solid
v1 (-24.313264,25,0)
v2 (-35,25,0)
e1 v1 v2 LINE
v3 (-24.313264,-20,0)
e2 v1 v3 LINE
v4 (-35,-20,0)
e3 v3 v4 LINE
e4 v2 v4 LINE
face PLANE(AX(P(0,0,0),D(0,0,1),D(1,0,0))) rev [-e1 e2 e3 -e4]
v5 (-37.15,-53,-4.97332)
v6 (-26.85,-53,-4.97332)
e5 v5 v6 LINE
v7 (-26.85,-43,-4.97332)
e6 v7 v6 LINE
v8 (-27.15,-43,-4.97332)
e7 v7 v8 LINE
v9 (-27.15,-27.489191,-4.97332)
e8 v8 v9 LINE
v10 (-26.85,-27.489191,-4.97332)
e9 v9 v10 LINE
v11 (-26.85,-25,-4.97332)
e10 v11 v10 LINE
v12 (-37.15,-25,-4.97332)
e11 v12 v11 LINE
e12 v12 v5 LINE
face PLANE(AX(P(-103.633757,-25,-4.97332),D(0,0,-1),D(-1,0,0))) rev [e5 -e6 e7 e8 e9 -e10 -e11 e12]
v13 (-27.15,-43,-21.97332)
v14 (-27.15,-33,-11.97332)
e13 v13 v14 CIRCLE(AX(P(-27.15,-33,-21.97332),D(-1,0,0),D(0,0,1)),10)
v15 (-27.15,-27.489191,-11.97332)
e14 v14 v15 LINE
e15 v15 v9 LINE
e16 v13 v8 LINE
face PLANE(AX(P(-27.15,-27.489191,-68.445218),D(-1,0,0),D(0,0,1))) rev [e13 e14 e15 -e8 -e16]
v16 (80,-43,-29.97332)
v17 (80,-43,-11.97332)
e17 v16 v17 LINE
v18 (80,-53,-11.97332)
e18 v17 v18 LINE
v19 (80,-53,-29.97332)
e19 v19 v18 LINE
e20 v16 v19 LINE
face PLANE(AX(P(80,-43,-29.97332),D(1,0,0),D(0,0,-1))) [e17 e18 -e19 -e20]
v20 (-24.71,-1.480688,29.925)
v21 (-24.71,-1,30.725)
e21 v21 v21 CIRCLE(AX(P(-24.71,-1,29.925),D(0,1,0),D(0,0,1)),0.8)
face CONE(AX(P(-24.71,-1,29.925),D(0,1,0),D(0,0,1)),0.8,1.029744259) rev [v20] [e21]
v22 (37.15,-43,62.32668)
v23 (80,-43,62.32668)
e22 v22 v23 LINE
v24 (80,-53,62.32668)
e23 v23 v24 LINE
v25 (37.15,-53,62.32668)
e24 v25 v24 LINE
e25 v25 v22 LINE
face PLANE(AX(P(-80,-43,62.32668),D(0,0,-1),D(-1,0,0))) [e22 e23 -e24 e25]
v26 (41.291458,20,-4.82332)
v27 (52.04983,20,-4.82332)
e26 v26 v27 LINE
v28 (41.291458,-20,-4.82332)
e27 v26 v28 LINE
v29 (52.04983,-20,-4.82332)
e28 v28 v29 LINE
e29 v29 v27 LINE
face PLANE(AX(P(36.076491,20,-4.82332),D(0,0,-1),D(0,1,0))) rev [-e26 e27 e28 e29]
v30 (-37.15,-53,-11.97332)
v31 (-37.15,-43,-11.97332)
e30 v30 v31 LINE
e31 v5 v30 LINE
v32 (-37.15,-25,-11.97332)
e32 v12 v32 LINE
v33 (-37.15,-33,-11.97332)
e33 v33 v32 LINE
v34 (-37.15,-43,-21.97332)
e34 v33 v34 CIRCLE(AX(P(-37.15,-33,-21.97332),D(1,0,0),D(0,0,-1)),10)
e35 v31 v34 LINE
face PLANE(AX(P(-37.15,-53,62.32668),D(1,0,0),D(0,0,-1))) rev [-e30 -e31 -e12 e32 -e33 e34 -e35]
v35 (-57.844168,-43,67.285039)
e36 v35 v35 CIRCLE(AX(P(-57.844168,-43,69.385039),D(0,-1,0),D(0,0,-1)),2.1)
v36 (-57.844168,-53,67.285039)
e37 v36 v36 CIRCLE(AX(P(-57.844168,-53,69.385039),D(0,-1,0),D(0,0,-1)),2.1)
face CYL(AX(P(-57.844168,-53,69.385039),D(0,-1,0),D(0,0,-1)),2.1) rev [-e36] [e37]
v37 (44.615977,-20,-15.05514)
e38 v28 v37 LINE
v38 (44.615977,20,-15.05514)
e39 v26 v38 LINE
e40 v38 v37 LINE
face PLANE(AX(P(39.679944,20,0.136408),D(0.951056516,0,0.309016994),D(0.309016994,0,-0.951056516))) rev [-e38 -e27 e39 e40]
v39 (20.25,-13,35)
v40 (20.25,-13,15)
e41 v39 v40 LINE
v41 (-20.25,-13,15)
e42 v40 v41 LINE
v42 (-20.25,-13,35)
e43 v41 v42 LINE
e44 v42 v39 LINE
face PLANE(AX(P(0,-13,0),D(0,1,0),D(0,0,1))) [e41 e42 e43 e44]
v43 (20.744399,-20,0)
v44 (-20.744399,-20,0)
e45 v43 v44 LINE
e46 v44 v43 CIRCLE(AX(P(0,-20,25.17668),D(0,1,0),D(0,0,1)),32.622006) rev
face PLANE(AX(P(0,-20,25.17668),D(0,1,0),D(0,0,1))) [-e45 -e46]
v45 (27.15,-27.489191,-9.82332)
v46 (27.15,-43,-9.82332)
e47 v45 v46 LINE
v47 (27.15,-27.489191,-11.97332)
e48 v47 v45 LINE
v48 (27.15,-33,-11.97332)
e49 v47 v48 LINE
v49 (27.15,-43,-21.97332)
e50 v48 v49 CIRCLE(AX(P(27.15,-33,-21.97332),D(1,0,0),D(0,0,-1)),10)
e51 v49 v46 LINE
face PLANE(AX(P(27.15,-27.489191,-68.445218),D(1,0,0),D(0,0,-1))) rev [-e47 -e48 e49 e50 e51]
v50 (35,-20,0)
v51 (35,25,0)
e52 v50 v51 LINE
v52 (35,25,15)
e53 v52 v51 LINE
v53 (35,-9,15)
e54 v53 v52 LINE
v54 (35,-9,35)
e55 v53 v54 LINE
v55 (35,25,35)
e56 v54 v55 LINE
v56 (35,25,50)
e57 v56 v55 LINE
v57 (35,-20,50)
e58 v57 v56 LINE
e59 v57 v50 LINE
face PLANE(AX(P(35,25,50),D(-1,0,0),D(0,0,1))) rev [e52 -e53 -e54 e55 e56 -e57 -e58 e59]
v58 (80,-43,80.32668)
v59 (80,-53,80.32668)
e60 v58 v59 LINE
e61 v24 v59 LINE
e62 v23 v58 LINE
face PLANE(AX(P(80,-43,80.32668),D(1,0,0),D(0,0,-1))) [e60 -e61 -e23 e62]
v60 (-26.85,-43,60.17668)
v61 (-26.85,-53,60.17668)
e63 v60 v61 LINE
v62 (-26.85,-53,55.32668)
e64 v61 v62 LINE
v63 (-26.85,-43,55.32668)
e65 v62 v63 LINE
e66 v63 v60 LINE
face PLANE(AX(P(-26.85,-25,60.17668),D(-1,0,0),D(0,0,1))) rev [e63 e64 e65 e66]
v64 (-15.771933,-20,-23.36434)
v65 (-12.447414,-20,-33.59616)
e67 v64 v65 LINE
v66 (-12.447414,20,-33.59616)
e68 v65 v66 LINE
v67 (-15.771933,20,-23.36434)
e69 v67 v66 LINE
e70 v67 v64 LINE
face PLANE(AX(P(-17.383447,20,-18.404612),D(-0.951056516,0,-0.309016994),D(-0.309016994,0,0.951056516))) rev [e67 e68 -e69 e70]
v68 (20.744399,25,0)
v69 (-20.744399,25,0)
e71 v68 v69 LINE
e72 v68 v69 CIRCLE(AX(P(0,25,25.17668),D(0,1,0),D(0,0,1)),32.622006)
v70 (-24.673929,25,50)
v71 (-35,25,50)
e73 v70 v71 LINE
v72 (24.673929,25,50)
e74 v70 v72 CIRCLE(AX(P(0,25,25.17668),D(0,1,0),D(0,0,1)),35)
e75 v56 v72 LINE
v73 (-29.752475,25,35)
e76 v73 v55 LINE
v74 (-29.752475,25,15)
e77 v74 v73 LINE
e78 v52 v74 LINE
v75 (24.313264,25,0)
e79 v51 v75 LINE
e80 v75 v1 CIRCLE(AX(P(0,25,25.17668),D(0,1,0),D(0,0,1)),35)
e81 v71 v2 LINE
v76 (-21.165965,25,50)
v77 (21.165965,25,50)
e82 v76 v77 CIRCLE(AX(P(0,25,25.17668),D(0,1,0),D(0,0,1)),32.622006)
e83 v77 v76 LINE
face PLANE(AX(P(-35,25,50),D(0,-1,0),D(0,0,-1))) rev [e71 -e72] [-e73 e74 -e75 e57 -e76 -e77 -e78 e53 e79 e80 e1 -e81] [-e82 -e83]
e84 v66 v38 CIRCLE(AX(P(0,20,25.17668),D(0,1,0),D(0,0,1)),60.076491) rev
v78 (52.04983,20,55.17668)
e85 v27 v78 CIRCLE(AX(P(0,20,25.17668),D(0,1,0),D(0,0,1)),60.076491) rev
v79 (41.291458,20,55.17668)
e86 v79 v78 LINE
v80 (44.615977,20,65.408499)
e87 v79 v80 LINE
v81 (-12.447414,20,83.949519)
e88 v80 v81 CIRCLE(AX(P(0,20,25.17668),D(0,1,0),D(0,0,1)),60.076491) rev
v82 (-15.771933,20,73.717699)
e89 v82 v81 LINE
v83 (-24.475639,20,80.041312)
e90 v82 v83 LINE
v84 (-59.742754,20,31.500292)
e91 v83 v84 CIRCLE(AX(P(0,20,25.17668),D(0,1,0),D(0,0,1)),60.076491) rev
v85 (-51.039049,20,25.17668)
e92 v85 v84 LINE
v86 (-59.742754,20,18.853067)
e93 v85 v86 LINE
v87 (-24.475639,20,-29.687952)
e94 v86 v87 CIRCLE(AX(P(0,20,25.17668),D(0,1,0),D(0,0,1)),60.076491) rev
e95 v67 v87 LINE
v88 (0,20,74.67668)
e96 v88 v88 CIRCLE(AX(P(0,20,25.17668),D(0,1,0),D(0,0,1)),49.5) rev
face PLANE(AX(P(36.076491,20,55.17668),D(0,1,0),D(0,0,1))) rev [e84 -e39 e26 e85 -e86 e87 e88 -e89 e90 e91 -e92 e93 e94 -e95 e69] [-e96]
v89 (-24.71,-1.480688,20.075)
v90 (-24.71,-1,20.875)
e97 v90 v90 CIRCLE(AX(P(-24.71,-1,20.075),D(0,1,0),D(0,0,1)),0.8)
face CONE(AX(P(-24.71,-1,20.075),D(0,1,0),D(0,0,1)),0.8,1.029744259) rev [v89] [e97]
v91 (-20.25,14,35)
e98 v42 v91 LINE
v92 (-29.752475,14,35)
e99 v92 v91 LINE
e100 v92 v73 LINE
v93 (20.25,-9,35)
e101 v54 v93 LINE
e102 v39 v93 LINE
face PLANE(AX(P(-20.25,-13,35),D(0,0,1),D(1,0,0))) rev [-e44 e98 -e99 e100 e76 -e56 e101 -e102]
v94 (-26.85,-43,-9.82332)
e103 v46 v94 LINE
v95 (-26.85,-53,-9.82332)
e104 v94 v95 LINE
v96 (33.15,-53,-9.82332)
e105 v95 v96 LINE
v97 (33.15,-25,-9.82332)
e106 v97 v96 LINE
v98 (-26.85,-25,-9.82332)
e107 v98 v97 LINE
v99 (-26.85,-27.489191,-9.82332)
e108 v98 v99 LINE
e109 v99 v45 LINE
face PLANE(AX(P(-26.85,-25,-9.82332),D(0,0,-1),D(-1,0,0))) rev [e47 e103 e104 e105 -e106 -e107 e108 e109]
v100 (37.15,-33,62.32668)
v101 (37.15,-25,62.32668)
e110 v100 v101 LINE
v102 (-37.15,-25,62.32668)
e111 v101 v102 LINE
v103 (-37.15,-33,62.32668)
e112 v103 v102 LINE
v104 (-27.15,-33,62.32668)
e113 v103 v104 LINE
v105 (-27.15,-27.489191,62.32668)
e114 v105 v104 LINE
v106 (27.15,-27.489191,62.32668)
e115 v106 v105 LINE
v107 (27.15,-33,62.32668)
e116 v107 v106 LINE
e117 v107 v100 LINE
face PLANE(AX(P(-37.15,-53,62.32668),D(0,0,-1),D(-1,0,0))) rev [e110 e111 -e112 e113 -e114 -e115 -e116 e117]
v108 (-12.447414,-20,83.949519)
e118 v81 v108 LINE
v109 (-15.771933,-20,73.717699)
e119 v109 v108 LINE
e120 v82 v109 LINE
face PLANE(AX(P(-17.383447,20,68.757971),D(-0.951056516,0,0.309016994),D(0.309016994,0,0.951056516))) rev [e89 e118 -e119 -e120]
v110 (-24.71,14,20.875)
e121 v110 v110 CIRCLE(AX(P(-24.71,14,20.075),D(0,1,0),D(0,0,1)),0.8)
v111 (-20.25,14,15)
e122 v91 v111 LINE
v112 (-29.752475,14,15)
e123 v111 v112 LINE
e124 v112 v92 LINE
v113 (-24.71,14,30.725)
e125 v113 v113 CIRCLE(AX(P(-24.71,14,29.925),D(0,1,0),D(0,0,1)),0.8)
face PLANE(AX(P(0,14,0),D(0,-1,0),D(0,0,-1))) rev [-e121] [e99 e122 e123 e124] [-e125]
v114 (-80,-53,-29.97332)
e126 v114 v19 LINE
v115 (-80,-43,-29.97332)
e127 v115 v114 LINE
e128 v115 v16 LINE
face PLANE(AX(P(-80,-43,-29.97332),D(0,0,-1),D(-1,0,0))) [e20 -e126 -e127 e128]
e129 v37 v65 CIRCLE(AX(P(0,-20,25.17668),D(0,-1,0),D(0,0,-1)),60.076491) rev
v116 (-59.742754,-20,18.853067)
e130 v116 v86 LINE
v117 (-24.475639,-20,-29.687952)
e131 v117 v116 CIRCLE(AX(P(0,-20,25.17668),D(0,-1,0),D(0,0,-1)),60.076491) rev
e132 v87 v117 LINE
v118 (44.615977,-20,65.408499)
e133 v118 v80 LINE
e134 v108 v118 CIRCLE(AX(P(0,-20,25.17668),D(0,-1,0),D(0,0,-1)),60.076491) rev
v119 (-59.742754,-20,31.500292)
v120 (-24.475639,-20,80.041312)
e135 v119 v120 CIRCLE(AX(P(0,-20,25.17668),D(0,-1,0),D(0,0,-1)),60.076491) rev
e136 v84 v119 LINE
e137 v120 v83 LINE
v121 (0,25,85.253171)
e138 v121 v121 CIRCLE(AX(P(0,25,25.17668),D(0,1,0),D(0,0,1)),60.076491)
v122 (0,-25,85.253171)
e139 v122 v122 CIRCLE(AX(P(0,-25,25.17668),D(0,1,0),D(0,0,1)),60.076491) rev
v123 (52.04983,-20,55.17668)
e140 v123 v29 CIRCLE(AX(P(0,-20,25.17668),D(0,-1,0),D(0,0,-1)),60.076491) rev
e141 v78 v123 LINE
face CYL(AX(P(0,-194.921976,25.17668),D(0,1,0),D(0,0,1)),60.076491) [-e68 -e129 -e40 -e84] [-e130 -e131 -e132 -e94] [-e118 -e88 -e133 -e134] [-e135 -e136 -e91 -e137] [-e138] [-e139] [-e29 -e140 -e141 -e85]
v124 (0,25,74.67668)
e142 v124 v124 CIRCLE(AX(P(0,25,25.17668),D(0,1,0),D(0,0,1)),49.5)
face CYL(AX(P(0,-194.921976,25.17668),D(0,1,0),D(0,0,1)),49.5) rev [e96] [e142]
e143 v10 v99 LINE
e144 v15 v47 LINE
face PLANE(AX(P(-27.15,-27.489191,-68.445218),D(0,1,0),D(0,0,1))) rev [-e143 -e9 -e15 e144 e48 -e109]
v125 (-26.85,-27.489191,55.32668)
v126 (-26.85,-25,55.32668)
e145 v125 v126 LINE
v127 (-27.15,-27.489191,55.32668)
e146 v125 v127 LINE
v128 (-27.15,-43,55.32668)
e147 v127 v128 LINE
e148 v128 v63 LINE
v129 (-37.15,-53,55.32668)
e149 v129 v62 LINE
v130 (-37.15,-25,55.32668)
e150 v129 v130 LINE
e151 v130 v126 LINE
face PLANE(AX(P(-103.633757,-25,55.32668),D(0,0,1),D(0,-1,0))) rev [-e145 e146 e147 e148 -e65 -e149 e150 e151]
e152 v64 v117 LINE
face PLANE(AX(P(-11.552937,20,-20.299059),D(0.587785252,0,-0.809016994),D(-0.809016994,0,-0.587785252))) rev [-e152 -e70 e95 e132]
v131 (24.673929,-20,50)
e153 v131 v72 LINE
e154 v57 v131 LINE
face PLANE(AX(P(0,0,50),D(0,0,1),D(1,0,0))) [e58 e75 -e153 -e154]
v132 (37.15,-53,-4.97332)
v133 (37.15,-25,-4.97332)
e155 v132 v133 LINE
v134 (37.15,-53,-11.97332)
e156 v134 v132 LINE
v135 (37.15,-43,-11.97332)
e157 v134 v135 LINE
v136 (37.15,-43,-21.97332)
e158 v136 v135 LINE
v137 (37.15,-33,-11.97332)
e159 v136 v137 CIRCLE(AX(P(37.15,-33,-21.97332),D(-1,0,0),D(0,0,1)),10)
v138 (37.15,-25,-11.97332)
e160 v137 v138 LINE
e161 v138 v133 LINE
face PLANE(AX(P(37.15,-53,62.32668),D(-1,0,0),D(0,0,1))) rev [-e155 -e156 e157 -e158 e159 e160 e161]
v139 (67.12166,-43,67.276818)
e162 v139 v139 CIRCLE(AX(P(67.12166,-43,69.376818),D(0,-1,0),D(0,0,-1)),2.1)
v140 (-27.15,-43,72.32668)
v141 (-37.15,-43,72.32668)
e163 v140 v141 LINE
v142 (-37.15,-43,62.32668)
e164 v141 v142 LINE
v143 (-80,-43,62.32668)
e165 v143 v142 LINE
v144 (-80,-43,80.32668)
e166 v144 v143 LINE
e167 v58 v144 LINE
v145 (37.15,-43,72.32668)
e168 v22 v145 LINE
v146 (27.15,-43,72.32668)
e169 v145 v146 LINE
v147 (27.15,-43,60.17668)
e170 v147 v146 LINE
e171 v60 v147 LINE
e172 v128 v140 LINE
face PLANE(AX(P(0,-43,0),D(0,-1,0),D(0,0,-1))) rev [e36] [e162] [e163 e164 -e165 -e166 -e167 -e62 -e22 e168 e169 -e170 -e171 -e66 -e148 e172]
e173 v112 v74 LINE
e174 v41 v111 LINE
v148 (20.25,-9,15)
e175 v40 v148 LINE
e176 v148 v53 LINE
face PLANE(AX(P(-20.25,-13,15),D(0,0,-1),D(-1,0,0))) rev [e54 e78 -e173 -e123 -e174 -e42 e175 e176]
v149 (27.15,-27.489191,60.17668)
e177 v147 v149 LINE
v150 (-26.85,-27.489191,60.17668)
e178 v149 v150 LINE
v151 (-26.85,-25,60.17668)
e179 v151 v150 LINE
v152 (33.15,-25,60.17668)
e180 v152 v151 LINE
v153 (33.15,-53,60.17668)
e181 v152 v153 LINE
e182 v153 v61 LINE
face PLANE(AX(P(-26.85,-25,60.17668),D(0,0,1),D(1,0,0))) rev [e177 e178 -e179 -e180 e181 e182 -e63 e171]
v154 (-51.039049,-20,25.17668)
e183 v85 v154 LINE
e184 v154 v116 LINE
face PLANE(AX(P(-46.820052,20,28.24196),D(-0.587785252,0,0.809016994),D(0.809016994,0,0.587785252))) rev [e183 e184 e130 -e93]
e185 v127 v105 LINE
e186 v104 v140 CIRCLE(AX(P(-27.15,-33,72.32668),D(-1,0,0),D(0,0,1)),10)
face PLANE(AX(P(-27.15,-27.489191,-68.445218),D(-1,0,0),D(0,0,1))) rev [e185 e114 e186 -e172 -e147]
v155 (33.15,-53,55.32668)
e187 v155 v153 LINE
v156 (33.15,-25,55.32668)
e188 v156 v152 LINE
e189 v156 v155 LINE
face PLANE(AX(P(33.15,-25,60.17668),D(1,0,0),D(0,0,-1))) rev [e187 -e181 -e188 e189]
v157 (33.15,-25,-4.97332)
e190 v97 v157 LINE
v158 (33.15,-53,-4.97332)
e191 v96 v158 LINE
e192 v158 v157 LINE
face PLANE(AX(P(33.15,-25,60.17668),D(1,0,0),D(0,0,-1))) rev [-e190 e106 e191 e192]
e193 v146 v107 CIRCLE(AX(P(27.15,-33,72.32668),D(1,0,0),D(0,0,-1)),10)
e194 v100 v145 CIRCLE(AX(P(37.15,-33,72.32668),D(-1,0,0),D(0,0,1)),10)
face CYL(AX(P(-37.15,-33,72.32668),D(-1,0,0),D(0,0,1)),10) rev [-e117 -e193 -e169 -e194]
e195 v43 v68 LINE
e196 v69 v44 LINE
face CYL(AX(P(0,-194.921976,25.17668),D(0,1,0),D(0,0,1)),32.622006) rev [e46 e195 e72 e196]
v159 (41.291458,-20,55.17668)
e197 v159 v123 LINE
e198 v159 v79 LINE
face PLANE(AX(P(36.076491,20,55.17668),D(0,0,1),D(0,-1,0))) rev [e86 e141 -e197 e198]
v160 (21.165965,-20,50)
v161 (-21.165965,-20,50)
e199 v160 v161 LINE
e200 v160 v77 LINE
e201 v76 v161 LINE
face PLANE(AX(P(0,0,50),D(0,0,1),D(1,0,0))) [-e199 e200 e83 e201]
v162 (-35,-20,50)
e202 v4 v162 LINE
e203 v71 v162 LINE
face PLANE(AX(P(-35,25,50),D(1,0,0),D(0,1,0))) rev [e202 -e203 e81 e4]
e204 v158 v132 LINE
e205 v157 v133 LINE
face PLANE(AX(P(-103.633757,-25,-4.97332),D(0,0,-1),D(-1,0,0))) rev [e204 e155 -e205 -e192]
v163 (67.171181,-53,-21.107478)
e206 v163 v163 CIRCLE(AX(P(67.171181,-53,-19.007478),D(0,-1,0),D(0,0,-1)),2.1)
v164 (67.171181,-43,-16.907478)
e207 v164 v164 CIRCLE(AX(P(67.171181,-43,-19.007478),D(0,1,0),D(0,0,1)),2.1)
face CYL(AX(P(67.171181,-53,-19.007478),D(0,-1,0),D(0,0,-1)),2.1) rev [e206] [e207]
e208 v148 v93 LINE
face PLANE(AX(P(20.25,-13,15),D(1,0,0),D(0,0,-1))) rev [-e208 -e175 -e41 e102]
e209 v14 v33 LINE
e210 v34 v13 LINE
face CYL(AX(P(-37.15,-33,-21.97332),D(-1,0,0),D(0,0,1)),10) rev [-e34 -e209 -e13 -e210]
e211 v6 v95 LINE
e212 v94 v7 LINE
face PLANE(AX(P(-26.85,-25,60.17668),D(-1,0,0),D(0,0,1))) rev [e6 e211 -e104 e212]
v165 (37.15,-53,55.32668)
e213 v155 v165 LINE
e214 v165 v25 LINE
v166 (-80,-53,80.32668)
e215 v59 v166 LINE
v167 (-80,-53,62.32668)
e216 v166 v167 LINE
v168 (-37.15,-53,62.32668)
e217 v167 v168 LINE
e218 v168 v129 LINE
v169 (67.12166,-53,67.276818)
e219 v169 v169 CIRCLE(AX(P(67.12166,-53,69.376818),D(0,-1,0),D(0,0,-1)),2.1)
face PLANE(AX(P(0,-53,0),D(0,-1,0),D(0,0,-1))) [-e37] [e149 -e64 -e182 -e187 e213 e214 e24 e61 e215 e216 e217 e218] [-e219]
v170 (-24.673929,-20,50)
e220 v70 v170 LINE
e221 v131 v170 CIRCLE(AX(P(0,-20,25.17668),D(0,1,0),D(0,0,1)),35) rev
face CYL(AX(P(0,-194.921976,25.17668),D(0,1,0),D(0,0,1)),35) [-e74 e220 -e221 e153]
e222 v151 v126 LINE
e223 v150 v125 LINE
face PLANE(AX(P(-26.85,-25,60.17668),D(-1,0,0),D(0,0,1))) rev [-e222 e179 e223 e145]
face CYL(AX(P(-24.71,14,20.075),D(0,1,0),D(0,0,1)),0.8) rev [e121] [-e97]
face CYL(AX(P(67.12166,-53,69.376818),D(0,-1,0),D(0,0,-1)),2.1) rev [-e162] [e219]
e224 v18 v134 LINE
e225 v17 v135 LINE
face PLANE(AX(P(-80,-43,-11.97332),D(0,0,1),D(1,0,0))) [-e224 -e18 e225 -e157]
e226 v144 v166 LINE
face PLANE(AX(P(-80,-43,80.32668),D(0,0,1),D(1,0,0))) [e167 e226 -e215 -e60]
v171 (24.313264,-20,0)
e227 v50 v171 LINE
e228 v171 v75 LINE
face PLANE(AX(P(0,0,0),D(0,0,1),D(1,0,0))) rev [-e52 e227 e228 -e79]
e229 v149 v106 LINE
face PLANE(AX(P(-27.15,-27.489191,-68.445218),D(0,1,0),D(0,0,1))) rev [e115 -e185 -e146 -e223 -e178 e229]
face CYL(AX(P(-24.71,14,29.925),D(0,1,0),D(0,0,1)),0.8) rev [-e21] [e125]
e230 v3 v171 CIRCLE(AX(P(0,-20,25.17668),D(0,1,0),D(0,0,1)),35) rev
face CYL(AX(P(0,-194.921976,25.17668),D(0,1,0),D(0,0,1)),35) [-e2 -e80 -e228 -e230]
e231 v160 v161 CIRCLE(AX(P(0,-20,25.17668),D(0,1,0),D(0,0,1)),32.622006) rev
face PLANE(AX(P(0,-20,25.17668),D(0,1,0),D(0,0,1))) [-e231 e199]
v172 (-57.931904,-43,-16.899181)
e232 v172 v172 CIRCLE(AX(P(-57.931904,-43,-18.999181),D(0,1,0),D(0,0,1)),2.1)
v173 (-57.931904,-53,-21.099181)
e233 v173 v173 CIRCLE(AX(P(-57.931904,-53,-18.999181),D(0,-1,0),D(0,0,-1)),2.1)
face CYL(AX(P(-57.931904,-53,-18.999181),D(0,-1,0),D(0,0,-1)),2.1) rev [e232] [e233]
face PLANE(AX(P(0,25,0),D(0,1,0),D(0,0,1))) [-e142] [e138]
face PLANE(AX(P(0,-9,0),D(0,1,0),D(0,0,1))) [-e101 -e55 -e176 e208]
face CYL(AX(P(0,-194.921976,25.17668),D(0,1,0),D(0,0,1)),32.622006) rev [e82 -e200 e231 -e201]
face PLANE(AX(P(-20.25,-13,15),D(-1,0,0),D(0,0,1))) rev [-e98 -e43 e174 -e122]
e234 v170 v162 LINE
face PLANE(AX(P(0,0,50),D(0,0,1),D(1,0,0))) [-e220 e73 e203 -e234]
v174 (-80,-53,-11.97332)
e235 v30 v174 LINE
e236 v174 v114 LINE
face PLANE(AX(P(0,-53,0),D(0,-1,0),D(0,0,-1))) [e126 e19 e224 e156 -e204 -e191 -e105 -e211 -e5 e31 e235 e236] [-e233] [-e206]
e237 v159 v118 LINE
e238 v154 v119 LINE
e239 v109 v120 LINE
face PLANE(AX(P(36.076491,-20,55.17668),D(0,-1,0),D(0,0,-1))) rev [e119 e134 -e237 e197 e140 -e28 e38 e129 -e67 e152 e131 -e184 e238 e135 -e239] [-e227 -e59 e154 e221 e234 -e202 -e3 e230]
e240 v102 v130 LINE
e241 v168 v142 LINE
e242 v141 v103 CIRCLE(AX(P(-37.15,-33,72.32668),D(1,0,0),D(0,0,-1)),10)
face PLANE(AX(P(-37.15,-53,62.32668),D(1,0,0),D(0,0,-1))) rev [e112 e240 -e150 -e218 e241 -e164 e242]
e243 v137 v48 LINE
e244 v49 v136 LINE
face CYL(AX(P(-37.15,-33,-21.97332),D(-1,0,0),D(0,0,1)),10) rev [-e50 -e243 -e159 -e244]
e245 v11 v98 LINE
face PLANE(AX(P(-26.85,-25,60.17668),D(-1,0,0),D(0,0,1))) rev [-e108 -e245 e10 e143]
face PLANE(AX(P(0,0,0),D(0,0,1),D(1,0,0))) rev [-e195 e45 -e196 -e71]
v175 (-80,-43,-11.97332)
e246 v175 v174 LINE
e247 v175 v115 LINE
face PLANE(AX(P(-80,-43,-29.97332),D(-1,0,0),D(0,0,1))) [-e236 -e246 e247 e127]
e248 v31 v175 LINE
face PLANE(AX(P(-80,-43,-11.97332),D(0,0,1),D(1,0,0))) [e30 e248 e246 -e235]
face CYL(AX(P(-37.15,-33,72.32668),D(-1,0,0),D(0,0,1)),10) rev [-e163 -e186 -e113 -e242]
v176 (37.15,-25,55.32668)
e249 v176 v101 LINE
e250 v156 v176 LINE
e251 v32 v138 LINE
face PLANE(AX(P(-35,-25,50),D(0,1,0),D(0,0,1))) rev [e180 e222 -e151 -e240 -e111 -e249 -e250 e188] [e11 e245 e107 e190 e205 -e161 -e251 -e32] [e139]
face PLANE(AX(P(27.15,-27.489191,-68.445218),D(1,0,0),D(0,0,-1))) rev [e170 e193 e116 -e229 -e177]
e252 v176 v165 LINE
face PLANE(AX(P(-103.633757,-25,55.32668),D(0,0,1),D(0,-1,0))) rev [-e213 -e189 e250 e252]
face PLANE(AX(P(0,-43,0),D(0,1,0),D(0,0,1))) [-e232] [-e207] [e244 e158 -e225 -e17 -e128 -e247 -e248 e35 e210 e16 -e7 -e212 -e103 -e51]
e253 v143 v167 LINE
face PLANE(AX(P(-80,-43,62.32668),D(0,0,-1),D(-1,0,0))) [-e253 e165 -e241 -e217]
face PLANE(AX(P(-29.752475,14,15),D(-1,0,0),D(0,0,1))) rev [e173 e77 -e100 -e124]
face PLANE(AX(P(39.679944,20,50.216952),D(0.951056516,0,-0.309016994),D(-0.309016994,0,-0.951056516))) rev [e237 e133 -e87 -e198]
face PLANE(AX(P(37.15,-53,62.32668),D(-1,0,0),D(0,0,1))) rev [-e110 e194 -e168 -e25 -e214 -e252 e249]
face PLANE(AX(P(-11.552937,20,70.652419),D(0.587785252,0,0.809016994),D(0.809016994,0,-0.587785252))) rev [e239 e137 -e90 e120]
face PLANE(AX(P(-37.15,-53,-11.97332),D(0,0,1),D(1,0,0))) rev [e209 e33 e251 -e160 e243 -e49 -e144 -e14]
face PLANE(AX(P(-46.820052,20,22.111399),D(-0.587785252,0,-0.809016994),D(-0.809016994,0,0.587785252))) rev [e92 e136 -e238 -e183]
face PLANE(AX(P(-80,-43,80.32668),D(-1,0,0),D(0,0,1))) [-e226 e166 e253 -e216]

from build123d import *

# Parameters (mm, degrees)
ESQUISSE1_W                  = 70
ESQUISSE1_H                  = 50
BOSS_EXTRU_1_DEPTH           = 50
ESQUISSE2_W                  = 40.5
ESQUISSE2_H                  = 20
ENL_V_MAT_EXTRU_1_DEPTH      = 38
ESQUISSE3_W                  = 9.502474521
ESQUISSE3_H                  = 20
ENL_V_MAT_EXTRU_2_DEPTH      = 11
ESQUISSE4_R                  = 60.076490873
ESQUISSE4_R_2                = 49.5
BOSS_EXTRU_2_DEPTH           = 50
ESQUISSE5_W                  = 60
ESQUISSE5_H                  = 40
ENL_V_MAT_EXTRU_3_DEPTH      = 24
R_P_TITION_START             = -20
R_P_TITION_CIRCULAIRE1_DEPTH = 40
ESQUISSE12_W                 = 74.3
ESQUISSE12_H                 = 74.3
BOSS_EXTRU_7_DEPTH           = 28
ESQUISSE13_W                 = 160
ESQUISSE13_H                 = 18
BOSS_EXTRU_8_DEPTH           = 10
ESQUISSE15_R                 = 60.076490873
BOSS_EXTRU_9_DEPTH           = 5
ESQUISSE16_W                 = 60
ESQUISSE16_H                 = 70
ENL_V_MAT_EXTRU_4_DEPTH      = 28
ENL_V_MAT_EXTRU_5_REACH      = 156.276
ESQUISSE17_W                 = 60.3
ESQUISSE17_H                 = 28
ENL_V_MAT_EXTRU_6_REACH      = 138.609
ESQUISSE18_W                 = 54.3
ESQUISSE18_H                 = 15.510808694
TROU_TARAUD_M5X0_82_D        = 4.2
TROU_TARAUD_M5X0_82_DEPTH    = 54.927
TROU_TARAUD_M5X0_82_TIP      = 1.2618073
TROU_TARAUD_M5X0_83_D        = 4.2
TROU_TARAUD_M5X0_83_DEPTH    = 54.927
TROU_TARAUD_M5X0_83_TIP      = 1.2618073
CONG_1_R                     = 10
ESQUISSE25_W                 = 16.470730929
ESQUISSE25_H                 = 20
ENL_V_MAT_EXTRU_7_DEPTH      = 34
TROU_TARAUD_M2X0_41_D        = 1.6
TROU_TARAUD_M2X0_41_DEPTH    = 15
TROU_TARAUD_M2X0_41_TIP      = 0.480688495


# Read off the part's stored shape, not the designer's step: Répétition circulaire1
with BuildPart() as part:
    # Esquisse1 → Boss.-Extru.1 (new body)
    with BuildSketch(Plane.XY):
        Rectangle(ESQUISSE1_W, ESQUISSE1_H)
    extrude(amount=BOSS_EXTRU_1_DEPTH)

    # Esquisse2 → Enlèv. mat.-Extru.1 (cut)
    with BuildSketch(Plane(origin=(0, 25, 0), x_dir=(1, 0, 0), z_dir=(0, 1, 0))):
        with Locations((0, -25)):
            Rectangle(ESQUISSE2_W, ESQUISSE2_H)
    extrude(amount=-ENL_V_MAT_EXTRU_1_DEPTH, mode=Mode.SUBTRACT)

    # Esquisse3 → Enlèv. mat.-Extru.2 (cut)
    with BuildSketch(Plane(origin=(0, 25, 0), x_dir=(1, 0, 0), z_dir=(0, 1, 0))):
        with Locations((25.001237261, -25)):
            Rectangle(ESQUISSE3_W, ESQUISSE3_H)
        with Locations((-25.001237261, -25)):
            Rectangle(ESQUISSE3_W, ESQUISSE3_H)
    extrude(amount=-ENL_V_MAT_EXTRU_2_DEPTH, mode=Mode.SUBTRACT)

    # Esquisse4 → Boss.-Extru.2 (add)
    # profile 1 of 7: a face of its own
    with BuildSketch(Plane(origin=(0, 25, 0), x_dir=(1, 0, 0), z_dir=(0, 1, 0))):
        with Locations(Location((0, -25.176679726, 0), (0, 0, 270))):
            Circle(ESQUISSE4_R)
        with Locations(Location((0, -25.176679726, 0), (0, 0, 270))):
            Circle(ESQUISSE4_R_2, mode=Mode.SUBTRACT)
    # profile 2 of 7: a face of its own
    with BuildSketch(Plane(origin=(0, 25, 0), x_dir=(1, 0, 0), z_dir=(0, 1, 0))):
        with BuildLine():
            ThreePointArc((24.673928965, -50), (32.315534297, -38.619381951), (35, -25.176679726))
            ThreePointArc((35, -25.176679726), (32.217729855, -11.501231543), (24.313263828, 0))
            Line((24.313263828, 0), (20.744399349, 0))
            ThreePointArc((20.744399349, 0), (29.503552635, -11.257782921), (32.622006474, -25.176679726))
            ThreePointArc((32.622006474, -25.176679726), (29.619854452, -38.846336948), (21.16596506, -50))
            Line((21.16596506, -50), (24.673928965, -50))
        make_face()
    # profile 3 of 7: a face of its own
    with BuildSketch(Plane(origin=(0, 25, 0), x_dir=(1, 0, 0), z_dir=(0, 1, 0))):
        with BuildLine():
            Line((-20.744399349, 0), (-24.313263828, 0))
            ThreePointArc((-24.313263828, 0), (-34.99908948, -24.924220698), (-24.673928965, -50))
            Line((-24.673928965, -50), (-21.16596506, -50))
            ThreePointArc((-21.16596506, -50), (-32.620847034, -24.901643114), (-20.744399349, 0))
        make_face()
    # profile 4 of 7: a face of its own
    with BuildSketch(Plane(origin=(0, 25, 0), x_dir=(1, 0, 0), z_dir=(0, 1, 0))):
        with BuildLine():
            Line((20.744399349, 0), (24.313263828, 0))
            ThreePointArc((24.313263828, 0), (0, 9.823320274), (-24.313263828, 0))
            Line((-24.313263828, 0), (-20.744399349, 0))
            ThreePointArc((-20.744399349, 0), (0, 7.445326748), (20.744399349, 0))
        make_face()
    # profile 5 of 7: a face of its own
    with BuildSketch(Plane(origin=(0, 25, 0), x_dir=(1, 0, 0), z_dir=(0, 1, 0))):
        with BuildLine():
            ThreePointArc((24.673928965, -50), (32.315534297, -38.619381951), (35, -25.176679726))
            ThreePointArc((35, -25.176679726), (32.217729855, -11.501231543), (24.313263828, 0))
            Line((24.313263828, 0), (20.744399349, 0))
            ThreePointArc((20.744399349, 0), (29.503552635, -11.257782921), (32.622006474, -25.176679726))
            ThreePointArc((32.622006474, -25.176679726), (29.619854452, -38.846336948), (21.16596506, -50))
            Line((21.16596506, -50), (24.673928965, -50))
        make_face()
    # profile 6 of 7: a face of its own
    with BuildSketch(Plane(origin=(0, 25, 0), x_dir=(1, 0, 0), z_dir=(0, 1, 0))):
        with BuildLine():
            Line((-20.744399349, 0), (-24.313263828, 0))
            ThreePointArc((-24.313263828, 0), (-34.99908948, -24.924220698), (-24.673928965, -50))
            Line((-24.673928965, -50), (-21.16596506, -50))
            ThreePointArc((-21.16596506, -50), (-32.620847034, -24.901643114), (-20.744399349, 0))
        make_face()
    # profile 7 of 7: a face of its own
    with BuildSketch(Plane(origin=(0, 25, 0), x_dir=(1, 0, 0), z_dir=(0, 1, 0))):
        with BuildLine():
            ThreePointArc((-24.673928965, -50), (0, -60.176679726), (24.673928965, -50))
            Line((24.673928965, -50), (21.16596506, -50))
            ThreePointArc((21.16596506, -50), (0, -57.798686199), (-21.16596506, -50))
            Line((-21.16596506, -50), (-24.673928965, -50))
        make_face()
    extrude(amount=-BOSS_EXTRU_2_DEPTH)


with BuildPart() as boss_extru_2_piece_1:
    # of the separate pieces the step leaves, piece 1, a body of its own (boss_extru_2_pieces)
    add(part.part.solids().sort_by_distance((0, 25, 85.253170599))[0])

    # Esquisse5 → Enlèv. mat.-Extru.3 (cut)
    with BuildSketch(Plane(origin=(60.076490873, 0, 0), x_dir=(0, 0, -1), z_dir=(1, 0, 0))):
        with Locations((-25.176679726, 0)):
            Rectangle(ESQUISSE5_W, ESQUISSE5_H)
    extrude(amount=-ENL_V_MAT_EXTRU_3_DEPTH, mode=Mode.SUBTRACT)

    # Répétition circulaire1 outline → Répétition circulaire1 (cut)
    with BuildSketch(Plane(origin=(0, 0, 0), x_dir=(1, 0, 0), z_dir=(0, 1, 0)).offset(R_P_TITION_START)):
        with BuildLine():
            Line((39.373214245, 4.823320274), (41.291457614, 4.823320274))
            Line((41.291457614, 4.823320274), (44.615977372, 15.055140003))
            ThreePointArc((44.615977372, 15.055140003), (18.564656642, 31.959458395), (-12.447413605, 33.596159666))
            Line((-12.447413605, 33.596159666), (-15.771933364, 23.364339937))
            Line((-15.771933364, 23.364339937), (-24.475639087, 29.687952296))
            ThreePointArc((-24.475639087, 29.687952296), (-48.602902078, 10.135395619), (-59.742754225, -18.853067366))
            Line((-59.742754225, -18.853067366), (-51.039048501, -25.176679726))
            Line((-51.039048501, -25.176679726), (-59.742754225, -31.500292085))
            ThreePointArc((-59.742754225, -31.500292085), (-48.602902079, -60.488755071), (-24.475639087, -80.041311748))
            Line((-24.475639087, -80.041311748), (-15.771933364, -73.717699388))
            Line((-15.771933364, -73.717699388), (-12.447413605, -83.949519118))
            ThreePointArc((-12.447413605, -83.949519118), (18.564656643, -82.312817847), (44.615977373, -65.408499455))
            Line((44.615977373, -65.408499455), (41.291457614, -55.176679726))
            Line((41.291457614, -55.176679726), (39.373214245, -55.176679726))
            ThreePointArc((39.373214245, -55.176679726), (-49.5, -25.176679726), (39.373214245, 4.823320274))
        make_face()
    extrude(amount=R_P_TITION_CIRCULAIRE1_DEPTH, mode=Mode.SUBTRACT)



with BuildPart() as boss_extru_2_piece_2:
    # of the separate pieces the step leaves, piece 2, a body of its own (boss_extru_2_pieces)
    add(part.part.solids().sort_by_distance((-35, 25, 0))[0])


with BuildPart() as boss_extru_2_piece_1_1:
    add(boss_extru_2_piece_1.part)

    add(boss_extru_2_piece_2.part)  # Boss.-Extru.7 merges Boss.-Extru.2 piece 2
    # Esquisse12 → Boss.-Extru.7 (add)
    with BuildSketch(Plane.XZ.offset(25)):
        with Locations((0, 25.176679726)):
            Rectangle(ESQUISSE12_W, ESQUISSE12_H)
    extrude(amount=BOSS_EXTRU_7_DEPTH)

    # Esquisse13 → Boss.-Extru.8 (add)
    with BuildSketch(Plane.XZ.offset(53)):
        with Locations((0, 71.326679726)):
            Rectangle(ESQUISSE13_W, ESQUISSE13_H)
        with Locations((0, -20.973320274)):
            Rectangle(ESQUISSE13_W, ESQUISSE13_H)
    extrude(amount=-BOSS_EXTRU_8_DEPTH)

    # Esquisse15 → Boss.-Extru.9 (add)
    with BuildSketch(Plane(origin=(0, -20, 0), x_dir=(1, 0, 0), z_dir=(0, 1, 0))):
        with Locations(Location((0, -25.176679726, 0), (0, 0, 270))):
            Circle(ESQUISSE15_R)
    extrude(amount=-BOSS_EXTRU_9_DEPTH)

    # Esquisse16 → Enlèv. mat.-Extru.4 (cut)
    with BuildSketch(Plane.XZ.offset(53)):
        with Locations((3.15, 25.176679726)):
            Rectangle(ESQUISSE16_W, ESQUISSE16_H)
    extrude(amount=-ENL_V_MAT_EXTRU_4_DEPTH, mode=Mode.SUBTRACT)

    # Enlèv. mat.-Extru.5: up to this face of the body (flat: up to its plane)
    enl_v_mat_extru_5_end = Plane(boss_extru_2_piece_1_1.part.faces().sort_by_distance((-37.15, -39, 25.176679726))[0])
    # Esquisse17 → Enlèv. mat.-Extru.5 (cut, up to the picked face)
    with BuildSketch(Plane(origin=(37.15, 0, 0), x_dir=(0, 0, -1), z_dir=(1, 0, 0)), mode=Mode.PRIVATE) as enl_v_mat_extru_5_sk1:
        with Locations((-25.176679726, -39)):
            Rectangle(ESQUISSE17_W, ESQUISSE17_H)
    enl_v_mat_extru_5_tool1 = split(extrude(enl_v_mat_extru_5_sk1.sketch, amount=-ENL_V_MAT_EXTRU_5_REACH, mode=Mode.PRIVATE), bisect_by=enl_v_mat_extru_5_end, keep=Keep.BOTH, mode=Mode.PRIVATE)
    add(enl_v_mat_extru_5_tool1.solids().sort_by(Axis((37.15, -39, 25.17668), (-1, 0, 0)))[0], mode=Mode.SUBTRACT)

    # Enlèv. mat.-Extru.6: up to this face of the body (flat: up to its plane)
    enl_v_mat_extru_6_end = Plane(boss_extru_2_piece_1_1.part.faces().sort_by_distance((0, -34, -11.973320274))[0])
    # Esquisse18 → Enlèv. mat.-Extru.6 (cut, up to the picked face)
    with BuildSketch(Plane.XY.offset(62.326679726), mode=Mode.PRIVATE) as enl_v_mat_extru_6_sk1:
        with Locations((0, -35.244595653)):
            Rectangle(ESQUISSE18_W, ESQUISSE18_H)
    enl_v_mat_extru_6_tool1 = split(extrude(enl_v_mat_extru_6_sk1.sketch, amount=-ENL_V_MAT_EXTRU_6_REACH, mode=Mode.PRIVATE), bisect_by=enl_v_mat_extru_6_end, keep=Keep.BOTH, mode=Mode.PRIVATE)
    add(enl_v_mat_extru_6_tool1.solids().sort_by(Axis((0, -35.244596, 62.32668), (0, 0, -1)))[0], mode=Mode.SUBTRACT)

    # Trou taraudé M5x0.82
    with Locations(Plane(origin=(-57.931903984, -53, -18.999181229), x_dir=(0, 0, -1), z_dir=(0, -1, 0))):
        with Locations((0, 0), (-88.38422, 0.087735642)):
            Hole(TROU_TARAUD_M5X0_82_D / 2, depth=TROU_TARAUD_M5X0_82_DEPTH)
            with Locations((0, 0, -(TROU_TARAUD_M5X0_82_DEPTH + TROU_TARAUD_M5X0_82_TIP / 2))):  # 118° drill point
                Cone(0, TROU_TARAUD_M5X0_82_D / 2, TROU_TARAUD_M5X0_82_TIP, mode=Mode.SUBTRACT)

    # Trou taraudé M5x0.83
    with Locations(Plane(origin=(67.121659864, -53, 69.376817601), x_dir=(0, 0, -1), z_dir=(0, -1, 0))):
        with Locations((0, 0), (88.384296015, 0.049521474)):
            Hole(TROU_TARAUD_M5X0_83_D / 2, depth=TROU_TARAUD_M5X0_83_DEPTH)
            with Locations((0, 0, -(TROU_TARAUD_M5X0_83_DEPTH + TROU_TARAUD_M5X0_83_TIP / 2))):  # 118° drill point
                Cone(0, TROU_TARAUD_M5X0_83_D / 2, TROU_TARAUD_M5X0_83_TIP, mode=Mode.SUBTRACT)

    # Congé1
    cong_1_edges = [boss_extru_2_piece_1_1.edges().sort_by_distance(p)[0] for p in [
        (-32.15, -43, 62.326679726),
        (32.15, -43, -11.973320274),
        (32.15, -43, 62.326679726),
        (-32.15, -43, -11.973320274),
    ]]
    fillet(cong_1_edges, radius=CONG_1_R)

    # Esquisse25 → Enlèv. mat.-Extru.7 (cut)
    with BuildSketch(Plane(origin=(0, 25, 0), x_dir=(1, 0, 0), z_dir=(0, 1, 0))):
        with Locations((26.764634536, -25)):
            Rectangle(ESQUISSE25_W, ESQUISSE25_H)
    extrude(amount=-ENL_V_MAT_EXTRU_7_DEPTH, mode=Mode.SUBTRACT)

    # Trou taraudé M2x0.41
    with Locations(Plane(origin=(-24.71, 14, 20.075), x_dir=(0, 0, 1), z_dir=(0, 1, 0))):
        with Locations((0, 0), (9.85, 0)):
            Hole(TROU_TARAUD_M2X0_41_D / 2, depth=TROU_TARAUD_M2X0_41_DEPTH)
            with Locations((0, 0, -(TROU_TARAUD_M2X0_41_DEPTH + TROU_TARAUD_M2X0_41_TIP / 2))):  # 118° drill point
                Cone(0, TROU_TARAUD_M2X0_41_D / 2, TROU_TARAUD_M2X0_41_TIP, mode=Mode.SUBTRACT)


solid = boss_extru_2_piece_1_1.part
